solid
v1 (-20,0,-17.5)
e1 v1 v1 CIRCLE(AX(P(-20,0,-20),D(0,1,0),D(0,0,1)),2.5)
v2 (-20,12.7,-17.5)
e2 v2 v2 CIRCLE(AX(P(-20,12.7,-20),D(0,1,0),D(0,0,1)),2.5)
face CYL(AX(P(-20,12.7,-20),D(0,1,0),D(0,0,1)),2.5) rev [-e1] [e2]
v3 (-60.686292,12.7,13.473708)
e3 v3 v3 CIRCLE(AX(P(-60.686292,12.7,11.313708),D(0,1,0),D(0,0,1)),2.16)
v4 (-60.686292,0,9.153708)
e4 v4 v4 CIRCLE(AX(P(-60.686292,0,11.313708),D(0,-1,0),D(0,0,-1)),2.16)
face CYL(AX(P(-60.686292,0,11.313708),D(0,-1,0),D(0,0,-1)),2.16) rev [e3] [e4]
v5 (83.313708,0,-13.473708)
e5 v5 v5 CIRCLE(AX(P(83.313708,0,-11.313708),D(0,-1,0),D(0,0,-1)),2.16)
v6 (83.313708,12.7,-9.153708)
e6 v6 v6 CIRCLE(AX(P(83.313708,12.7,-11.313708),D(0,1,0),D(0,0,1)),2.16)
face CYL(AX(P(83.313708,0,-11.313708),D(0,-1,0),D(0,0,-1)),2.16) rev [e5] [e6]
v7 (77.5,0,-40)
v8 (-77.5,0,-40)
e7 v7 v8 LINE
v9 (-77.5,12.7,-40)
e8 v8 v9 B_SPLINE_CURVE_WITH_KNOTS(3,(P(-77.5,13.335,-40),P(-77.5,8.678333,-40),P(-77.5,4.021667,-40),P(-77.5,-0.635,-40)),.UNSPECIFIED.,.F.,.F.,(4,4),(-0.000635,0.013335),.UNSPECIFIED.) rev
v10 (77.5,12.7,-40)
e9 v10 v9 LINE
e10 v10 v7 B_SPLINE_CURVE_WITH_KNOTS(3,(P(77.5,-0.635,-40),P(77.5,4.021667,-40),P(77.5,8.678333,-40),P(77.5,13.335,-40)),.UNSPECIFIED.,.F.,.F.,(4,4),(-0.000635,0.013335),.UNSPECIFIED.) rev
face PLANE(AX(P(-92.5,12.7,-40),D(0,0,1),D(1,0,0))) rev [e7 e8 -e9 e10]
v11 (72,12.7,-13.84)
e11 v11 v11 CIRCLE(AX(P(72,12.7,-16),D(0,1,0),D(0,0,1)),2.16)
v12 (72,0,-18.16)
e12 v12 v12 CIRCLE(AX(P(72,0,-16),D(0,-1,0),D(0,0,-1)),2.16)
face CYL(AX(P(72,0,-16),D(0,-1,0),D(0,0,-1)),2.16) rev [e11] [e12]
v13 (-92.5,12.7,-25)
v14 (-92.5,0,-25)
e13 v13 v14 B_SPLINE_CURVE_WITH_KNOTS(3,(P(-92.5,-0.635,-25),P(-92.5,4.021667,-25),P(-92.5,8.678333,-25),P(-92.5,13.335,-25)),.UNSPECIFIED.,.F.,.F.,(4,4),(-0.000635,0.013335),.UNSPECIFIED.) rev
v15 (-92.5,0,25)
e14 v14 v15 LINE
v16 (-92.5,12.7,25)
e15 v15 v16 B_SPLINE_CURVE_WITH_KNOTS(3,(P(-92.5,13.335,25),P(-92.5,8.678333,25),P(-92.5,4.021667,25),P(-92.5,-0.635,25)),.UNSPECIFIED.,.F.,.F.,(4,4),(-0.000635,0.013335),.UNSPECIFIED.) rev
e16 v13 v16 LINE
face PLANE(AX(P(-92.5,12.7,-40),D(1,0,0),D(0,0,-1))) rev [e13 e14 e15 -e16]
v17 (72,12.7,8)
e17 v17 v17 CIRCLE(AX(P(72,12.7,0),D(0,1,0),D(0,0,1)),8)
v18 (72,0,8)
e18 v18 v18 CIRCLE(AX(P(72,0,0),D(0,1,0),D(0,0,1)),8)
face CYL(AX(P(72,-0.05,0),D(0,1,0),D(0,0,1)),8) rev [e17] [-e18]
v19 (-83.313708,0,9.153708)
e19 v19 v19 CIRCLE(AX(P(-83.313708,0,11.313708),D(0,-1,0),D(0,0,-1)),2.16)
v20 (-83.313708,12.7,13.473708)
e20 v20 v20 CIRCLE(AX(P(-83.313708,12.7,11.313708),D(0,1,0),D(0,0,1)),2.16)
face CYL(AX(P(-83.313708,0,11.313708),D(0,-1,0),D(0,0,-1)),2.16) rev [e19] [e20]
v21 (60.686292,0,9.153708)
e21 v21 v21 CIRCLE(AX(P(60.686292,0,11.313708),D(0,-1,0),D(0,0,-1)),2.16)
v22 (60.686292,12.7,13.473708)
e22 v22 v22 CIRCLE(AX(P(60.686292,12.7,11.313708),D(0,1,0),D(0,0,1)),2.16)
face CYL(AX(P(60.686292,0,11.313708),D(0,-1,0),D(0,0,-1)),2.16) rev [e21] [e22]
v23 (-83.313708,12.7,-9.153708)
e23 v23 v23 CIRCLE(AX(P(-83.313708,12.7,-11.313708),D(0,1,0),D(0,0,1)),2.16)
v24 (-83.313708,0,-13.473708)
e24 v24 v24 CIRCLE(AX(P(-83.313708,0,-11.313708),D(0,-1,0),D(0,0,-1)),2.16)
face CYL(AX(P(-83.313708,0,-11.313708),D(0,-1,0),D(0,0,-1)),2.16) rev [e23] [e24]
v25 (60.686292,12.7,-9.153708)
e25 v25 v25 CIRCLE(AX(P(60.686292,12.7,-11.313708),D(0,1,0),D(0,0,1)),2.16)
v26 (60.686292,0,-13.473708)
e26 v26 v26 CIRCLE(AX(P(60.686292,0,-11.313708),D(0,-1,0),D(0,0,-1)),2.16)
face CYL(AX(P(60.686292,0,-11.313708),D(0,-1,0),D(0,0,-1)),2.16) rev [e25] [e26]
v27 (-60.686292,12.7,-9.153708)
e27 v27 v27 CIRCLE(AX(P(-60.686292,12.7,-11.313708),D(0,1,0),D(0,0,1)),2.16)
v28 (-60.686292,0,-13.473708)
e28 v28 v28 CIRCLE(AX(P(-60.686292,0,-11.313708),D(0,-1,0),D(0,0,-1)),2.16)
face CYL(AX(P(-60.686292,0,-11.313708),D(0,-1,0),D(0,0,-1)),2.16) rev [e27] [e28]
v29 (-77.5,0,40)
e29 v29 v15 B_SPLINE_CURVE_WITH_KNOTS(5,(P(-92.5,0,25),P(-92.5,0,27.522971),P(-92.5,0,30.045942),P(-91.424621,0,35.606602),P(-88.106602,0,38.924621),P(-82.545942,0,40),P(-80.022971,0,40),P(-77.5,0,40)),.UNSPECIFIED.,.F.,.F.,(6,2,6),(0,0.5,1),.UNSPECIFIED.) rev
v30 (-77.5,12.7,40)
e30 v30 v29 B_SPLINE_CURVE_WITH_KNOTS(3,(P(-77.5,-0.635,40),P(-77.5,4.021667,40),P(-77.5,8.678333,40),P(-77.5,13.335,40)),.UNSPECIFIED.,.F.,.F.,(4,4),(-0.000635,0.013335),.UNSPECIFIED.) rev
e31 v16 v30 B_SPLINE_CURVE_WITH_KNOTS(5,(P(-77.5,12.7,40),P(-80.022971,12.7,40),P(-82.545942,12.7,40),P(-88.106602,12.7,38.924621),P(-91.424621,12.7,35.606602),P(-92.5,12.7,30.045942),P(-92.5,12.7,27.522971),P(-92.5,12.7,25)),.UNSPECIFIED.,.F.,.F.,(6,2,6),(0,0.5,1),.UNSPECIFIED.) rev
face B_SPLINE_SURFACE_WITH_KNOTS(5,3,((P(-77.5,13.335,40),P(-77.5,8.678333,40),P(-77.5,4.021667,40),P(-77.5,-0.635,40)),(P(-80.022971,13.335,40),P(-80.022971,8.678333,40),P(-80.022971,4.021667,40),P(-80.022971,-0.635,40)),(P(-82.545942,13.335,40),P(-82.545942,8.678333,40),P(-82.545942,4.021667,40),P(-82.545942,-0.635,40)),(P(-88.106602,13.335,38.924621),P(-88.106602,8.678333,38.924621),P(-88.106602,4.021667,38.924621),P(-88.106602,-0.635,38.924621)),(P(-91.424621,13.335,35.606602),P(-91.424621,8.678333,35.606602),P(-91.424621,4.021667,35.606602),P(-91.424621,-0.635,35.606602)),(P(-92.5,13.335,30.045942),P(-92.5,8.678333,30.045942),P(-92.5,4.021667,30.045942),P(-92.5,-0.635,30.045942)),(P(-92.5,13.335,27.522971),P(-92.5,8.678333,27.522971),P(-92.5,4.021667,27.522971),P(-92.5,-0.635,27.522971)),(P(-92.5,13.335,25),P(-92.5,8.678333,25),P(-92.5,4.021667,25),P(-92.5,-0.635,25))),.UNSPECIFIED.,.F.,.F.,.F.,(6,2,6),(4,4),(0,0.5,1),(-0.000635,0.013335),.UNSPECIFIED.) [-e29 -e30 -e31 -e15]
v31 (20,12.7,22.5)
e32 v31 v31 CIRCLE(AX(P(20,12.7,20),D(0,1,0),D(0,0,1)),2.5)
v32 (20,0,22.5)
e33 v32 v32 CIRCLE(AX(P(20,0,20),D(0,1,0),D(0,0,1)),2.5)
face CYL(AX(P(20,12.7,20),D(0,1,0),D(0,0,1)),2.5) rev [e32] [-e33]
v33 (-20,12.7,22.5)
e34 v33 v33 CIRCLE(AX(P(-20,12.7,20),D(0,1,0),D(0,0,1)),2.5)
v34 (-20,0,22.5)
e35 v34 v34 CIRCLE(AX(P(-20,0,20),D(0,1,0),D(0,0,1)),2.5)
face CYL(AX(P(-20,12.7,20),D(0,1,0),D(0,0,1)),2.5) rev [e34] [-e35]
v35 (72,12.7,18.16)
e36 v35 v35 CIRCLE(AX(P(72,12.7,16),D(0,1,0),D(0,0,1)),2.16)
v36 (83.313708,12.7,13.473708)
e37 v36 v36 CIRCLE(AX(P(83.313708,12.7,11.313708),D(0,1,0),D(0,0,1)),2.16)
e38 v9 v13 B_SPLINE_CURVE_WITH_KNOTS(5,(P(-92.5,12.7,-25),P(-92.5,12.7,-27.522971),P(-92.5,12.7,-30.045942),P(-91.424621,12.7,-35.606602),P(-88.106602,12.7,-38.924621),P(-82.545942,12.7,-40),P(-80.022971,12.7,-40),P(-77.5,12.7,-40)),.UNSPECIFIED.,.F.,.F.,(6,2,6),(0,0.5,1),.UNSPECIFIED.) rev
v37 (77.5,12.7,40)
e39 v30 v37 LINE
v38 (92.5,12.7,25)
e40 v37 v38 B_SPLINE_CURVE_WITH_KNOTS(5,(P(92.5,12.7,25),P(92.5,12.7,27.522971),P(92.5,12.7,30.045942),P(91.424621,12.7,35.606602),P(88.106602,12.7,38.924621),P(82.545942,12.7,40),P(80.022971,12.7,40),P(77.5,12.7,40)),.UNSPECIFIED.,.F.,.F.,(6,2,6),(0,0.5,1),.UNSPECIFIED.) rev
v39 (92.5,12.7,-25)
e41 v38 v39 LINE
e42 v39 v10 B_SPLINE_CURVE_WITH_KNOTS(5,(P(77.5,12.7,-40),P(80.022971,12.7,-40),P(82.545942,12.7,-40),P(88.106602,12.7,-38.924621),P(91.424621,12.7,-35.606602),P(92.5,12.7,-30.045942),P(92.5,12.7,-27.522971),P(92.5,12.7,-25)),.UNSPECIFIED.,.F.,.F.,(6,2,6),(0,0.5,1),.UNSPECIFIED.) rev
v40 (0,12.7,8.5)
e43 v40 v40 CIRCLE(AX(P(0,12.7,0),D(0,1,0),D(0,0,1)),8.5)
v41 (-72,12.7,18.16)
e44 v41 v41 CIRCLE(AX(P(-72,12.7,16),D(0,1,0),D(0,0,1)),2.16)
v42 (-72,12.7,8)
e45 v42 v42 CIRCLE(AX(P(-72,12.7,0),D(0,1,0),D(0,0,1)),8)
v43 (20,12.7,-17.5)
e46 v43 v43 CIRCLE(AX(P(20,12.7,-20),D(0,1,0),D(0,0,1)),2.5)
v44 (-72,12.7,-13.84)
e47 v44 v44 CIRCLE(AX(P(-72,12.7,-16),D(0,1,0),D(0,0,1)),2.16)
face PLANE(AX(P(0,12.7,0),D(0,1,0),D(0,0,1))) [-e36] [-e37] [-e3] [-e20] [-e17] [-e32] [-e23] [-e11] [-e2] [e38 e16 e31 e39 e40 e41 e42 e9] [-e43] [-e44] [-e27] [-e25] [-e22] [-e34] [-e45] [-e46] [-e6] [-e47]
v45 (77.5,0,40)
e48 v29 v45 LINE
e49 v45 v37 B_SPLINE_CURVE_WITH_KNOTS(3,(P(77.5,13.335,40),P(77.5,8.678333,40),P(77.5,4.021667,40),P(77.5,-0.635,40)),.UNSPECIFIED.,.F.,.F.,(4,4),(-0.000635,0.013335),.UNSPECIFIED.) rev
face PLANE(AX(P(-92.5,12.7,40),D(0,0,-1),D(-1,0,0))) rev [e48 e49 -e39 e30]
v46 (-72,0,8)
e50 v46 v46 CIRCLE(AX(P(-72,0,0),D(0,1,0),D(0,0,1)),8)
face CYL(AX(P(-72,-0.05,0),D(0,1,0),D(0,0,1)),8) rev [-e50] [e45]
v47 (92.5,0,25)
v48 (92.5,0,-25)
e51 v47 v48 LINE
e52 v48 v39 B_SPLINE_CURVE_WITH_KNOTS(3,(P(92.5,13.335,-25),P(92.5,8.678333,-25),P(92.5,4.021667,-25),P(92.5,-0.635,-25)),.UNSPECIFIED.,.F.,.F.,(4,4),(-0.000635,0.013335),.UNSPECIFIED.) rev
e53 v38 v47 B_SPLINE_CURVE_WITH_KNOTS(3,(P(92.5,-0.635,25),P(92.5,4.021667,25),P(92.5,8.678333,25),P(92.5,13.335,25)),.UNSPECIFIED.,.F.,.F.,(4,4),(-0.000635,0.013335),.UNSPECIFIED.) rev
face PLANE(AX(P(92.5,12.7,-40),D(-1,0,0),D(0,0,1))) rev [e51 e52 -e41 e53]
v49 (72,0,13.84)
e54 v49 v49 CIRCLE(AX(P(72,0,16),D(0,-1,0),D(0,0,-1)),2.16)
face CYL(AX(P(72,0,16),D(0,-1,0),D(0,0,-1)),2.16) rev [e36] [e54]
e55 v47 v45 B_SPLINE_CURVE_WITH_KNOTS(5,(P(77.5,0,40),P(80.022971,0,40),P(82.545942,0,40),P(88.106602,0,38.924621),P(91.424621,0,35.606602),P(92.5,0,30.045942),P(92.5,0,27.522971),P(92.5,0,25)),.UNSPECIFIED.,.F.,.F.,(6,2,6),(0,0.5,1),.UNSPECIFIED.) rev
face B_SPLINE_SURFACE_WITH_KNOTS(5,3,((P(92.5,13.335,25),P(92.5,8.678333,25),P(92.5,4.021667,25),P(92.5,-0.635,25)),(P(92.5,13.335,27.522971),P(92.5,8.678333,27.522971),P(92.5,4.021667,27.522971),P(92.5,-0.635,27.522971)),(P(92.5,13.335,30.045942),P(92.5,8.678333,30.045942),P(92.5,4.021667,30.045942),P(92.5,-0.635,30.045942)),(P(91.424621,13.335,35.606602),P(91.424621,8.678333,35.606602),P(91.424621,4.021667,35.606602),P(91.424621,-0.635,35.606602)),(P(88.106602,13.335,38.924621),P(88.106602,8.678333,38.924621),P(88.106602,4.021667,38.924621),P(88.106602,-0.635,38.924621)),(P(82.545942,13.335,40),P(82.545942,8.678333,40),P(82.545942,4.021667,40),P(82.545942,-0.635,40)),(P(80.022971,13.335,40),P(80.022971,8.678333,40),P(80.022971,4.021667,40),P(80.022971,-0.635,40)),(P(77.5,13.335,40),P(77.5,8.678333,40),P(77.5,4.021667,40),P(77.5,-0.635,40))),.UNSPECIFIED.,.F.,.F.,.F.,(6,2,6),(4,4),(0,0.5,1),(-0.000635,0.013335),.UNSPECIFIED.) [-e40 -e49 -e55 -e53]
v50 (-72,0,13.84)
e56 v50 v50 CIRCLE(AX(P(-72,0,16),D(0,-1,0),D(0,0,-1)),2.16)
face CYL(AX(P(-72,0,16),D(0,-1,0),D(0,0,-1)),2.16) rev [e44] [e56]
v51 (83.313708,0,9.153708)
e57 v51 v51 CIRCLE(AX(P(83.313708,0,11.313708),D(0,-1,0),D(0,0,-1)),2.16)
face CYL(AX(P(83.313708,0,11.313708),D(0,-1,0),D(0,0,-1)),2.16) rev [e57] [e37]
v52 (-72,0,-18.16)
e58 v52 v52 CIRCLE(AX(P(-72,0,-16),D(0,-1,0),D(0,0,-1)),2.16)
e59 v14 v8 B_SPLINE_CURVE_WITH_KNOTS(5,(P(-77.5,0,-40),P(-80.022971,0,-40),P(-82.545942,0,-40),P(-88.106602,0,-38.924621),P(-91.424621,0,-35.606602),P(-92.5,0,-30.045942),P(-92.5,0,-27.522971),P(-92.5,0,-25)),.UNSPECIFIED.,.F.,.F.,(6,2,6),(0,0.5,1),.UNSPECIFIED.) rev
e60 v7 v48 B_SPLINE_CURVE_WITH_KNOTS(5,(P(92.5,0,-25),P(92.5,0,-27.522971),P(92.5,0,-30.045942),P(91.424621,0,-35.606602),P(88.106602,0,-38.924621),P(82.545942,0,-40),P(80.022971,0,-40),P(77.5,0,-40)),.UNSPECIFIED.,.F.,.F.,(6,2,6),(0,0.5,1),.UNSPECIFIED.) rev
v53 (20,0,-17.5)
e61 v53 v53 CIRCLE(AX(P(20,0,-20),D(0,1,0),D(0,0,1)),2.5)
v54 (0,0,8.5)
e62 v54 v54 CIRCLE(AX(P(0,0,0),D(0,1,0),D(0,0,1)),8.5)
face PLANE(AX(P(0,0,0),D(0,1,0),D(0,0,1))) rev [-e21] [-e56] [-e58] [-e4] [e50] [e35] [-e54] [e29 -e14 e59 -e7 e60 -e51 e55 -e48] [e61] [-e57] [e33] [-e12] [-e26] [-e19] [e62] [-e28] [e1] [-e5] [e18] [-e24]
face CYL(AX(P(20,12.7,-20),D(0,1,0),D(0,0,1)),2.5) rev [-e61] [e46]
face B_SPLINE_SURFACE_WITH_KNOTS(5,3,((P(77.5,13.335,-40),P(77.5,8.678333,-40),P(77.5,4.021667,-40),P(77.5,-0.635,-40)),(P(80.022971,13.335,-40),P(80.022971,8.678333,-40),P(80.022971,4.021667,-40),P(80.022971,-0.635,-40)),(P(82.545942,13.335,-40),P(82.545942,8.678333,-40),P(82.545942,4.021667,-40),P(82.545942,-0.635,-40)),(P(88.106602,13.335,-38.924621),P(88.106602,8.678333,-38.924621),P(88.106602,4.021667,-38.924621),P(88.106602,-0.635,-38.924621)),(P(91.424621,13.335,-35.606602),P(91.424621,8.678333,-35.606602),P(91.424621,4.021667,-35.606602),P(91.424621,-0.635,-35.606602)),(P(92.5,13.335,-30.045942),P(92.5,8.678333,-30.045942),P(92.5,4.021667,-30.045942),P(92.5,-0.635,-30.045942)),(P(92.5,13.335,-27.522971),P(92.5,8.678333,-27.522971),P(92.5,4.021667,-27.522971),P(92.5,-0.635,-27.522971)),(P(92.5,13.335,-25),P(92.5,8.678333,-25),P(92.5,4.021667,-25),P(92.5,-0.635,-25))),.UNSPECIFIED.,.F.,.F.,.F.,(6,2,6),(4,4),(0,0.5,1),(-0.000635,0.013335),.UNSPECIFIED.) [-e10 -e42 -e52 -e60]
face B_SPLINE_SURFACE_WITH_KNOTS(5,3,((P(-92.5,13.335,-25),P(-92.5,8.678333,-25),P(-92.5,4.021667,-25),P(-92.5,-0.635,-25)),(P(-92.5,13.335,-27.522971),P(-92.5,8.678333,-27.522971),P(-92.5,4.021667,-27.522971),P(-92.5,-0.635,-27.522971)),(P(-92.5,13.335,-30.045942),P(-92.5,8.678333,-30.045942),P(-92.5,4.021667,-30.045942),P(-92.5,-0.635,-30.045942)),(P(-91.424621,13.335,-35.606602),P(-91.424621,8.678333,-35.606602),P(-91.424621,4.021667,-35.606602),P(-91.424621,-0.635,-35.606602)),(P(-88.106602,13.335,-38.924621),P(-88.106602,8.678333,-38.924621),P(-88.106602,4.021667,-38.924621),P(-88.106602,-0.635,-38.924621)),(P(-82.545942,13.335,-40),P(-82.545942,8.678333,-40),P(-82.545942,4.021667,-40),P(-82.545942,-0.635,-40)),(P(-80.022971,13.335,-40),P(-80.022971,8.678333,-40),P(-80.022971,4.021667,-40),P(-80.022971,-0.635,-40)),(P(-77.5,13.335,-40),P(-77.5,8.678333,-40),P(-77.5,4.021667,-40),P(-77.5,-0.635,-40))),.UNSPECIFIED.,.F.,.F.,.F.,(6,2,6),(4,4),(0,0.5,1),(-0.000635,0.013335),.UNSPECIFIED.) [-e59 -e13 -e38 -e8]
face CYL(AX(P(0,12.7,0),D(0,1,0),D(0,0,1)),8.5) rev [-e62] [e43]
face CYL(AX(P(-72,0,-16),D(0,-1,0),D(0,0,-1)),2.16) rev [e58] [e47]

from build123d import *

# Parameters (mm, degrees)
SKETCH1_W                     = 185
SKETCH1_H                     = 80
BOSS_EXTRUDE1_DEPTH           = 12.7
M16_CLEARANCE_HOLE1_D         = 17
M6X1_0_START                  = -1
M6X1_0_TAPPED_HOLE2_OUTLINE_R = 2.5
M6X1_0_TAPPED_HOLE2_DEPTH     = 15
FILLET1_SIZE                  = 15
SKETCH5_R                     = 8
CUT_EXTRUDE1_DEPTH            = 102.575292414
M4_CLEARANCE_HOLE1_D          = 4.32


with BuildPart() as part:
    # Sketch1 → Boss-Extrude1 (new body)
    with BuildSketch(Plane(origin=(0, 0, 0), x_dir=(1, 0, 0), z_dir=(0, 1, 0))):
        Rectangle(SKETCH1_W, SKETCH1_H)
    extrude(amount=BOSS_EXTRUDE1_DEPTH)

    # M16 Clearance Hole1 (through all)
    with Locations(Plane(origin=(0, 12.7, 0), x_dir=(1, 0, 0), z_dir=(0, 1, 0))):
        with Locations((0, 0)):
            Hole(M16_CLEARANCE_HOLE1_D / 2)

    # M6x1.0 Tapped Hole2: read off the stored shape, not the designer's step
    # M6x1.0 Tapped Hole2 outline → M6x1.0 Tapped Hole2 (cut)
    with BuildSketch(Plane(origin=(0, 0, 0), x_dir=(1, 0, 0), z_dir=(0, 1, 0)).offset(M6X1_0_START)):
        with Locations((20, 20)):
            Circle(M6X1_0_TAPPED_HOLE2_OUTLINE_R)
        with Locations((-20, -20)):
            Circle(M6X1_0_TAPPED_HOLE2_OUTLINE_R)
        with Locations((20, -20)):
            Circle(M6X1_0_TAPPED_HOLE2_OUTLINE_R)
        with Locations((-20, 20)):
            Circle(M6X1_0_TAPPED_HOLE2_OUTLINE_R)
    extrude(amount=M6X1_0_TAPPED_HOLE2_DEPTH, mode=Mode.SUBTRACT)

    # Fillet1
    # a fillet whose section is not a circle: 15 mm, written as the material it takes off along each edge
    with BuildSketch(Plane(origin=(-92.5, -37.5, -40), x_dir=(1, 0, 0), z_dir=(0, 1, 0)), Plane(origin=(-92.5, -37.5, 40), x_dir=(0, 0, -1), z_dir=(0, 1, 0))) as fillet1_piece_1:
        with BuildLine():
            add(Edge.make_bspline([(FILLET1_SIZE, 0), (FILLET1_SIZE * 0.831801948466, 0), (FILLET1_SIZE * 0.663603896932, 0), (FILLET1_SIZE * 0.292893218813, -FILLET1_SIZE * 0.0716919198361), (FILLET1_SIZE * 0.0716919198361, -FILLET1_SIZE * 0.292893218813), (0, -FILLET1_SIZE * 0.663603896932), (0, -FILLET1_SIZE * 0.831801948466), (0, -FILLET1_SIZE)], knots=[0, 0, 0, 0, 0, 0, 0.5, 0.5, 1, 1, 1, 1, 1, 1], degree=5))
            Line((0, -FILLET1_SIZE), (0, 0))
            Line((0, 0), (FILLET1_SIZE, 0))
        make_face()
    extrude(amount=87.7, mode=Mode.SUBTRACT)
    with BuildSketch(Plane(origin=(92.5, -37.5, -40), x_dir=(-1, 0, 0), z_dir=(0, 1, 0)), Plane(origin=(92.5, -37.5, 40), x_dir=(0, 0, -1), z_dir=(0, 1, 0))) as fillet1_piece_2:
        with BuildLine():
            add(Edge.make_bspline([(FILLET1_SIZE, 0), (FILLET1_SIZE * 0.831801948466, 0), (FILLET1_SIZE * 0.663603896932, 0), (FILLET1_SIZE * 0.292893218813, FILLET1_SIZE * 0.0716919198361), (FILLET1_SIZE * 0.0716919198361, FILLET1_SIZE * 0.292893218813), (0, FILLET1_SIZE * 0.663603896932), (0, FILLET1_SIZE * 0.831801948466), (0, FILLET1_SIZE)], knots=[0, 0, 0, 0, 0, 0, 0.5, 0.5, 1, 1, 1, 1, 1, 1], degree=5))
            Line((0, FILLET1_SIZE), (0, 0))
            Line((0, 0), (FILLET1_SIZE, 0))
        make_face()
    extrude(amount=87.7, mode=Mode.SUBTRACT)

    # Sketch5 → Cut-Extrude1 (cut, through all)
    with BuildSketch(Plane(origin=(0, 12.7, 0), x_dir=(1, 0, 0), z_dir=(0, 1, 0))):
        with Locations(Location((-72, 0, 0), (0, 0, 270))):
            Circle(SKETCH5_R)
        with Locations(Location((72, 0, 0), (0, 0, 270))):
            Circle(SKETCH5_R)
    extrude(amount=-CUT_EXTRUDE1_DEPTH, mode=Mode.SUBTRACT)

    # M4 Clearance Hole1 (through all)
    with Locations(Plane(origin=(0, 0, 0), x_dir=(-1, 0, 0), z_dir=(0, -1, 0))):
        with Locations((60.686291501, 11.313708499), (72, 16), (83.313708499, 11.313708499), (60.686291501, -11.313708499), (72, -16), (83.313708499, -11.313708499), (-83.313708499, -11.313708499), (-72, -16), (-60.686291501, -11.313708499), (-60.686291501, 11.313708499), (-83.313708499, 11.313708499), (-72, 16)):
            Hole(M4_CLEARANCE_HOLE1_D / 2)


solid = part.part
